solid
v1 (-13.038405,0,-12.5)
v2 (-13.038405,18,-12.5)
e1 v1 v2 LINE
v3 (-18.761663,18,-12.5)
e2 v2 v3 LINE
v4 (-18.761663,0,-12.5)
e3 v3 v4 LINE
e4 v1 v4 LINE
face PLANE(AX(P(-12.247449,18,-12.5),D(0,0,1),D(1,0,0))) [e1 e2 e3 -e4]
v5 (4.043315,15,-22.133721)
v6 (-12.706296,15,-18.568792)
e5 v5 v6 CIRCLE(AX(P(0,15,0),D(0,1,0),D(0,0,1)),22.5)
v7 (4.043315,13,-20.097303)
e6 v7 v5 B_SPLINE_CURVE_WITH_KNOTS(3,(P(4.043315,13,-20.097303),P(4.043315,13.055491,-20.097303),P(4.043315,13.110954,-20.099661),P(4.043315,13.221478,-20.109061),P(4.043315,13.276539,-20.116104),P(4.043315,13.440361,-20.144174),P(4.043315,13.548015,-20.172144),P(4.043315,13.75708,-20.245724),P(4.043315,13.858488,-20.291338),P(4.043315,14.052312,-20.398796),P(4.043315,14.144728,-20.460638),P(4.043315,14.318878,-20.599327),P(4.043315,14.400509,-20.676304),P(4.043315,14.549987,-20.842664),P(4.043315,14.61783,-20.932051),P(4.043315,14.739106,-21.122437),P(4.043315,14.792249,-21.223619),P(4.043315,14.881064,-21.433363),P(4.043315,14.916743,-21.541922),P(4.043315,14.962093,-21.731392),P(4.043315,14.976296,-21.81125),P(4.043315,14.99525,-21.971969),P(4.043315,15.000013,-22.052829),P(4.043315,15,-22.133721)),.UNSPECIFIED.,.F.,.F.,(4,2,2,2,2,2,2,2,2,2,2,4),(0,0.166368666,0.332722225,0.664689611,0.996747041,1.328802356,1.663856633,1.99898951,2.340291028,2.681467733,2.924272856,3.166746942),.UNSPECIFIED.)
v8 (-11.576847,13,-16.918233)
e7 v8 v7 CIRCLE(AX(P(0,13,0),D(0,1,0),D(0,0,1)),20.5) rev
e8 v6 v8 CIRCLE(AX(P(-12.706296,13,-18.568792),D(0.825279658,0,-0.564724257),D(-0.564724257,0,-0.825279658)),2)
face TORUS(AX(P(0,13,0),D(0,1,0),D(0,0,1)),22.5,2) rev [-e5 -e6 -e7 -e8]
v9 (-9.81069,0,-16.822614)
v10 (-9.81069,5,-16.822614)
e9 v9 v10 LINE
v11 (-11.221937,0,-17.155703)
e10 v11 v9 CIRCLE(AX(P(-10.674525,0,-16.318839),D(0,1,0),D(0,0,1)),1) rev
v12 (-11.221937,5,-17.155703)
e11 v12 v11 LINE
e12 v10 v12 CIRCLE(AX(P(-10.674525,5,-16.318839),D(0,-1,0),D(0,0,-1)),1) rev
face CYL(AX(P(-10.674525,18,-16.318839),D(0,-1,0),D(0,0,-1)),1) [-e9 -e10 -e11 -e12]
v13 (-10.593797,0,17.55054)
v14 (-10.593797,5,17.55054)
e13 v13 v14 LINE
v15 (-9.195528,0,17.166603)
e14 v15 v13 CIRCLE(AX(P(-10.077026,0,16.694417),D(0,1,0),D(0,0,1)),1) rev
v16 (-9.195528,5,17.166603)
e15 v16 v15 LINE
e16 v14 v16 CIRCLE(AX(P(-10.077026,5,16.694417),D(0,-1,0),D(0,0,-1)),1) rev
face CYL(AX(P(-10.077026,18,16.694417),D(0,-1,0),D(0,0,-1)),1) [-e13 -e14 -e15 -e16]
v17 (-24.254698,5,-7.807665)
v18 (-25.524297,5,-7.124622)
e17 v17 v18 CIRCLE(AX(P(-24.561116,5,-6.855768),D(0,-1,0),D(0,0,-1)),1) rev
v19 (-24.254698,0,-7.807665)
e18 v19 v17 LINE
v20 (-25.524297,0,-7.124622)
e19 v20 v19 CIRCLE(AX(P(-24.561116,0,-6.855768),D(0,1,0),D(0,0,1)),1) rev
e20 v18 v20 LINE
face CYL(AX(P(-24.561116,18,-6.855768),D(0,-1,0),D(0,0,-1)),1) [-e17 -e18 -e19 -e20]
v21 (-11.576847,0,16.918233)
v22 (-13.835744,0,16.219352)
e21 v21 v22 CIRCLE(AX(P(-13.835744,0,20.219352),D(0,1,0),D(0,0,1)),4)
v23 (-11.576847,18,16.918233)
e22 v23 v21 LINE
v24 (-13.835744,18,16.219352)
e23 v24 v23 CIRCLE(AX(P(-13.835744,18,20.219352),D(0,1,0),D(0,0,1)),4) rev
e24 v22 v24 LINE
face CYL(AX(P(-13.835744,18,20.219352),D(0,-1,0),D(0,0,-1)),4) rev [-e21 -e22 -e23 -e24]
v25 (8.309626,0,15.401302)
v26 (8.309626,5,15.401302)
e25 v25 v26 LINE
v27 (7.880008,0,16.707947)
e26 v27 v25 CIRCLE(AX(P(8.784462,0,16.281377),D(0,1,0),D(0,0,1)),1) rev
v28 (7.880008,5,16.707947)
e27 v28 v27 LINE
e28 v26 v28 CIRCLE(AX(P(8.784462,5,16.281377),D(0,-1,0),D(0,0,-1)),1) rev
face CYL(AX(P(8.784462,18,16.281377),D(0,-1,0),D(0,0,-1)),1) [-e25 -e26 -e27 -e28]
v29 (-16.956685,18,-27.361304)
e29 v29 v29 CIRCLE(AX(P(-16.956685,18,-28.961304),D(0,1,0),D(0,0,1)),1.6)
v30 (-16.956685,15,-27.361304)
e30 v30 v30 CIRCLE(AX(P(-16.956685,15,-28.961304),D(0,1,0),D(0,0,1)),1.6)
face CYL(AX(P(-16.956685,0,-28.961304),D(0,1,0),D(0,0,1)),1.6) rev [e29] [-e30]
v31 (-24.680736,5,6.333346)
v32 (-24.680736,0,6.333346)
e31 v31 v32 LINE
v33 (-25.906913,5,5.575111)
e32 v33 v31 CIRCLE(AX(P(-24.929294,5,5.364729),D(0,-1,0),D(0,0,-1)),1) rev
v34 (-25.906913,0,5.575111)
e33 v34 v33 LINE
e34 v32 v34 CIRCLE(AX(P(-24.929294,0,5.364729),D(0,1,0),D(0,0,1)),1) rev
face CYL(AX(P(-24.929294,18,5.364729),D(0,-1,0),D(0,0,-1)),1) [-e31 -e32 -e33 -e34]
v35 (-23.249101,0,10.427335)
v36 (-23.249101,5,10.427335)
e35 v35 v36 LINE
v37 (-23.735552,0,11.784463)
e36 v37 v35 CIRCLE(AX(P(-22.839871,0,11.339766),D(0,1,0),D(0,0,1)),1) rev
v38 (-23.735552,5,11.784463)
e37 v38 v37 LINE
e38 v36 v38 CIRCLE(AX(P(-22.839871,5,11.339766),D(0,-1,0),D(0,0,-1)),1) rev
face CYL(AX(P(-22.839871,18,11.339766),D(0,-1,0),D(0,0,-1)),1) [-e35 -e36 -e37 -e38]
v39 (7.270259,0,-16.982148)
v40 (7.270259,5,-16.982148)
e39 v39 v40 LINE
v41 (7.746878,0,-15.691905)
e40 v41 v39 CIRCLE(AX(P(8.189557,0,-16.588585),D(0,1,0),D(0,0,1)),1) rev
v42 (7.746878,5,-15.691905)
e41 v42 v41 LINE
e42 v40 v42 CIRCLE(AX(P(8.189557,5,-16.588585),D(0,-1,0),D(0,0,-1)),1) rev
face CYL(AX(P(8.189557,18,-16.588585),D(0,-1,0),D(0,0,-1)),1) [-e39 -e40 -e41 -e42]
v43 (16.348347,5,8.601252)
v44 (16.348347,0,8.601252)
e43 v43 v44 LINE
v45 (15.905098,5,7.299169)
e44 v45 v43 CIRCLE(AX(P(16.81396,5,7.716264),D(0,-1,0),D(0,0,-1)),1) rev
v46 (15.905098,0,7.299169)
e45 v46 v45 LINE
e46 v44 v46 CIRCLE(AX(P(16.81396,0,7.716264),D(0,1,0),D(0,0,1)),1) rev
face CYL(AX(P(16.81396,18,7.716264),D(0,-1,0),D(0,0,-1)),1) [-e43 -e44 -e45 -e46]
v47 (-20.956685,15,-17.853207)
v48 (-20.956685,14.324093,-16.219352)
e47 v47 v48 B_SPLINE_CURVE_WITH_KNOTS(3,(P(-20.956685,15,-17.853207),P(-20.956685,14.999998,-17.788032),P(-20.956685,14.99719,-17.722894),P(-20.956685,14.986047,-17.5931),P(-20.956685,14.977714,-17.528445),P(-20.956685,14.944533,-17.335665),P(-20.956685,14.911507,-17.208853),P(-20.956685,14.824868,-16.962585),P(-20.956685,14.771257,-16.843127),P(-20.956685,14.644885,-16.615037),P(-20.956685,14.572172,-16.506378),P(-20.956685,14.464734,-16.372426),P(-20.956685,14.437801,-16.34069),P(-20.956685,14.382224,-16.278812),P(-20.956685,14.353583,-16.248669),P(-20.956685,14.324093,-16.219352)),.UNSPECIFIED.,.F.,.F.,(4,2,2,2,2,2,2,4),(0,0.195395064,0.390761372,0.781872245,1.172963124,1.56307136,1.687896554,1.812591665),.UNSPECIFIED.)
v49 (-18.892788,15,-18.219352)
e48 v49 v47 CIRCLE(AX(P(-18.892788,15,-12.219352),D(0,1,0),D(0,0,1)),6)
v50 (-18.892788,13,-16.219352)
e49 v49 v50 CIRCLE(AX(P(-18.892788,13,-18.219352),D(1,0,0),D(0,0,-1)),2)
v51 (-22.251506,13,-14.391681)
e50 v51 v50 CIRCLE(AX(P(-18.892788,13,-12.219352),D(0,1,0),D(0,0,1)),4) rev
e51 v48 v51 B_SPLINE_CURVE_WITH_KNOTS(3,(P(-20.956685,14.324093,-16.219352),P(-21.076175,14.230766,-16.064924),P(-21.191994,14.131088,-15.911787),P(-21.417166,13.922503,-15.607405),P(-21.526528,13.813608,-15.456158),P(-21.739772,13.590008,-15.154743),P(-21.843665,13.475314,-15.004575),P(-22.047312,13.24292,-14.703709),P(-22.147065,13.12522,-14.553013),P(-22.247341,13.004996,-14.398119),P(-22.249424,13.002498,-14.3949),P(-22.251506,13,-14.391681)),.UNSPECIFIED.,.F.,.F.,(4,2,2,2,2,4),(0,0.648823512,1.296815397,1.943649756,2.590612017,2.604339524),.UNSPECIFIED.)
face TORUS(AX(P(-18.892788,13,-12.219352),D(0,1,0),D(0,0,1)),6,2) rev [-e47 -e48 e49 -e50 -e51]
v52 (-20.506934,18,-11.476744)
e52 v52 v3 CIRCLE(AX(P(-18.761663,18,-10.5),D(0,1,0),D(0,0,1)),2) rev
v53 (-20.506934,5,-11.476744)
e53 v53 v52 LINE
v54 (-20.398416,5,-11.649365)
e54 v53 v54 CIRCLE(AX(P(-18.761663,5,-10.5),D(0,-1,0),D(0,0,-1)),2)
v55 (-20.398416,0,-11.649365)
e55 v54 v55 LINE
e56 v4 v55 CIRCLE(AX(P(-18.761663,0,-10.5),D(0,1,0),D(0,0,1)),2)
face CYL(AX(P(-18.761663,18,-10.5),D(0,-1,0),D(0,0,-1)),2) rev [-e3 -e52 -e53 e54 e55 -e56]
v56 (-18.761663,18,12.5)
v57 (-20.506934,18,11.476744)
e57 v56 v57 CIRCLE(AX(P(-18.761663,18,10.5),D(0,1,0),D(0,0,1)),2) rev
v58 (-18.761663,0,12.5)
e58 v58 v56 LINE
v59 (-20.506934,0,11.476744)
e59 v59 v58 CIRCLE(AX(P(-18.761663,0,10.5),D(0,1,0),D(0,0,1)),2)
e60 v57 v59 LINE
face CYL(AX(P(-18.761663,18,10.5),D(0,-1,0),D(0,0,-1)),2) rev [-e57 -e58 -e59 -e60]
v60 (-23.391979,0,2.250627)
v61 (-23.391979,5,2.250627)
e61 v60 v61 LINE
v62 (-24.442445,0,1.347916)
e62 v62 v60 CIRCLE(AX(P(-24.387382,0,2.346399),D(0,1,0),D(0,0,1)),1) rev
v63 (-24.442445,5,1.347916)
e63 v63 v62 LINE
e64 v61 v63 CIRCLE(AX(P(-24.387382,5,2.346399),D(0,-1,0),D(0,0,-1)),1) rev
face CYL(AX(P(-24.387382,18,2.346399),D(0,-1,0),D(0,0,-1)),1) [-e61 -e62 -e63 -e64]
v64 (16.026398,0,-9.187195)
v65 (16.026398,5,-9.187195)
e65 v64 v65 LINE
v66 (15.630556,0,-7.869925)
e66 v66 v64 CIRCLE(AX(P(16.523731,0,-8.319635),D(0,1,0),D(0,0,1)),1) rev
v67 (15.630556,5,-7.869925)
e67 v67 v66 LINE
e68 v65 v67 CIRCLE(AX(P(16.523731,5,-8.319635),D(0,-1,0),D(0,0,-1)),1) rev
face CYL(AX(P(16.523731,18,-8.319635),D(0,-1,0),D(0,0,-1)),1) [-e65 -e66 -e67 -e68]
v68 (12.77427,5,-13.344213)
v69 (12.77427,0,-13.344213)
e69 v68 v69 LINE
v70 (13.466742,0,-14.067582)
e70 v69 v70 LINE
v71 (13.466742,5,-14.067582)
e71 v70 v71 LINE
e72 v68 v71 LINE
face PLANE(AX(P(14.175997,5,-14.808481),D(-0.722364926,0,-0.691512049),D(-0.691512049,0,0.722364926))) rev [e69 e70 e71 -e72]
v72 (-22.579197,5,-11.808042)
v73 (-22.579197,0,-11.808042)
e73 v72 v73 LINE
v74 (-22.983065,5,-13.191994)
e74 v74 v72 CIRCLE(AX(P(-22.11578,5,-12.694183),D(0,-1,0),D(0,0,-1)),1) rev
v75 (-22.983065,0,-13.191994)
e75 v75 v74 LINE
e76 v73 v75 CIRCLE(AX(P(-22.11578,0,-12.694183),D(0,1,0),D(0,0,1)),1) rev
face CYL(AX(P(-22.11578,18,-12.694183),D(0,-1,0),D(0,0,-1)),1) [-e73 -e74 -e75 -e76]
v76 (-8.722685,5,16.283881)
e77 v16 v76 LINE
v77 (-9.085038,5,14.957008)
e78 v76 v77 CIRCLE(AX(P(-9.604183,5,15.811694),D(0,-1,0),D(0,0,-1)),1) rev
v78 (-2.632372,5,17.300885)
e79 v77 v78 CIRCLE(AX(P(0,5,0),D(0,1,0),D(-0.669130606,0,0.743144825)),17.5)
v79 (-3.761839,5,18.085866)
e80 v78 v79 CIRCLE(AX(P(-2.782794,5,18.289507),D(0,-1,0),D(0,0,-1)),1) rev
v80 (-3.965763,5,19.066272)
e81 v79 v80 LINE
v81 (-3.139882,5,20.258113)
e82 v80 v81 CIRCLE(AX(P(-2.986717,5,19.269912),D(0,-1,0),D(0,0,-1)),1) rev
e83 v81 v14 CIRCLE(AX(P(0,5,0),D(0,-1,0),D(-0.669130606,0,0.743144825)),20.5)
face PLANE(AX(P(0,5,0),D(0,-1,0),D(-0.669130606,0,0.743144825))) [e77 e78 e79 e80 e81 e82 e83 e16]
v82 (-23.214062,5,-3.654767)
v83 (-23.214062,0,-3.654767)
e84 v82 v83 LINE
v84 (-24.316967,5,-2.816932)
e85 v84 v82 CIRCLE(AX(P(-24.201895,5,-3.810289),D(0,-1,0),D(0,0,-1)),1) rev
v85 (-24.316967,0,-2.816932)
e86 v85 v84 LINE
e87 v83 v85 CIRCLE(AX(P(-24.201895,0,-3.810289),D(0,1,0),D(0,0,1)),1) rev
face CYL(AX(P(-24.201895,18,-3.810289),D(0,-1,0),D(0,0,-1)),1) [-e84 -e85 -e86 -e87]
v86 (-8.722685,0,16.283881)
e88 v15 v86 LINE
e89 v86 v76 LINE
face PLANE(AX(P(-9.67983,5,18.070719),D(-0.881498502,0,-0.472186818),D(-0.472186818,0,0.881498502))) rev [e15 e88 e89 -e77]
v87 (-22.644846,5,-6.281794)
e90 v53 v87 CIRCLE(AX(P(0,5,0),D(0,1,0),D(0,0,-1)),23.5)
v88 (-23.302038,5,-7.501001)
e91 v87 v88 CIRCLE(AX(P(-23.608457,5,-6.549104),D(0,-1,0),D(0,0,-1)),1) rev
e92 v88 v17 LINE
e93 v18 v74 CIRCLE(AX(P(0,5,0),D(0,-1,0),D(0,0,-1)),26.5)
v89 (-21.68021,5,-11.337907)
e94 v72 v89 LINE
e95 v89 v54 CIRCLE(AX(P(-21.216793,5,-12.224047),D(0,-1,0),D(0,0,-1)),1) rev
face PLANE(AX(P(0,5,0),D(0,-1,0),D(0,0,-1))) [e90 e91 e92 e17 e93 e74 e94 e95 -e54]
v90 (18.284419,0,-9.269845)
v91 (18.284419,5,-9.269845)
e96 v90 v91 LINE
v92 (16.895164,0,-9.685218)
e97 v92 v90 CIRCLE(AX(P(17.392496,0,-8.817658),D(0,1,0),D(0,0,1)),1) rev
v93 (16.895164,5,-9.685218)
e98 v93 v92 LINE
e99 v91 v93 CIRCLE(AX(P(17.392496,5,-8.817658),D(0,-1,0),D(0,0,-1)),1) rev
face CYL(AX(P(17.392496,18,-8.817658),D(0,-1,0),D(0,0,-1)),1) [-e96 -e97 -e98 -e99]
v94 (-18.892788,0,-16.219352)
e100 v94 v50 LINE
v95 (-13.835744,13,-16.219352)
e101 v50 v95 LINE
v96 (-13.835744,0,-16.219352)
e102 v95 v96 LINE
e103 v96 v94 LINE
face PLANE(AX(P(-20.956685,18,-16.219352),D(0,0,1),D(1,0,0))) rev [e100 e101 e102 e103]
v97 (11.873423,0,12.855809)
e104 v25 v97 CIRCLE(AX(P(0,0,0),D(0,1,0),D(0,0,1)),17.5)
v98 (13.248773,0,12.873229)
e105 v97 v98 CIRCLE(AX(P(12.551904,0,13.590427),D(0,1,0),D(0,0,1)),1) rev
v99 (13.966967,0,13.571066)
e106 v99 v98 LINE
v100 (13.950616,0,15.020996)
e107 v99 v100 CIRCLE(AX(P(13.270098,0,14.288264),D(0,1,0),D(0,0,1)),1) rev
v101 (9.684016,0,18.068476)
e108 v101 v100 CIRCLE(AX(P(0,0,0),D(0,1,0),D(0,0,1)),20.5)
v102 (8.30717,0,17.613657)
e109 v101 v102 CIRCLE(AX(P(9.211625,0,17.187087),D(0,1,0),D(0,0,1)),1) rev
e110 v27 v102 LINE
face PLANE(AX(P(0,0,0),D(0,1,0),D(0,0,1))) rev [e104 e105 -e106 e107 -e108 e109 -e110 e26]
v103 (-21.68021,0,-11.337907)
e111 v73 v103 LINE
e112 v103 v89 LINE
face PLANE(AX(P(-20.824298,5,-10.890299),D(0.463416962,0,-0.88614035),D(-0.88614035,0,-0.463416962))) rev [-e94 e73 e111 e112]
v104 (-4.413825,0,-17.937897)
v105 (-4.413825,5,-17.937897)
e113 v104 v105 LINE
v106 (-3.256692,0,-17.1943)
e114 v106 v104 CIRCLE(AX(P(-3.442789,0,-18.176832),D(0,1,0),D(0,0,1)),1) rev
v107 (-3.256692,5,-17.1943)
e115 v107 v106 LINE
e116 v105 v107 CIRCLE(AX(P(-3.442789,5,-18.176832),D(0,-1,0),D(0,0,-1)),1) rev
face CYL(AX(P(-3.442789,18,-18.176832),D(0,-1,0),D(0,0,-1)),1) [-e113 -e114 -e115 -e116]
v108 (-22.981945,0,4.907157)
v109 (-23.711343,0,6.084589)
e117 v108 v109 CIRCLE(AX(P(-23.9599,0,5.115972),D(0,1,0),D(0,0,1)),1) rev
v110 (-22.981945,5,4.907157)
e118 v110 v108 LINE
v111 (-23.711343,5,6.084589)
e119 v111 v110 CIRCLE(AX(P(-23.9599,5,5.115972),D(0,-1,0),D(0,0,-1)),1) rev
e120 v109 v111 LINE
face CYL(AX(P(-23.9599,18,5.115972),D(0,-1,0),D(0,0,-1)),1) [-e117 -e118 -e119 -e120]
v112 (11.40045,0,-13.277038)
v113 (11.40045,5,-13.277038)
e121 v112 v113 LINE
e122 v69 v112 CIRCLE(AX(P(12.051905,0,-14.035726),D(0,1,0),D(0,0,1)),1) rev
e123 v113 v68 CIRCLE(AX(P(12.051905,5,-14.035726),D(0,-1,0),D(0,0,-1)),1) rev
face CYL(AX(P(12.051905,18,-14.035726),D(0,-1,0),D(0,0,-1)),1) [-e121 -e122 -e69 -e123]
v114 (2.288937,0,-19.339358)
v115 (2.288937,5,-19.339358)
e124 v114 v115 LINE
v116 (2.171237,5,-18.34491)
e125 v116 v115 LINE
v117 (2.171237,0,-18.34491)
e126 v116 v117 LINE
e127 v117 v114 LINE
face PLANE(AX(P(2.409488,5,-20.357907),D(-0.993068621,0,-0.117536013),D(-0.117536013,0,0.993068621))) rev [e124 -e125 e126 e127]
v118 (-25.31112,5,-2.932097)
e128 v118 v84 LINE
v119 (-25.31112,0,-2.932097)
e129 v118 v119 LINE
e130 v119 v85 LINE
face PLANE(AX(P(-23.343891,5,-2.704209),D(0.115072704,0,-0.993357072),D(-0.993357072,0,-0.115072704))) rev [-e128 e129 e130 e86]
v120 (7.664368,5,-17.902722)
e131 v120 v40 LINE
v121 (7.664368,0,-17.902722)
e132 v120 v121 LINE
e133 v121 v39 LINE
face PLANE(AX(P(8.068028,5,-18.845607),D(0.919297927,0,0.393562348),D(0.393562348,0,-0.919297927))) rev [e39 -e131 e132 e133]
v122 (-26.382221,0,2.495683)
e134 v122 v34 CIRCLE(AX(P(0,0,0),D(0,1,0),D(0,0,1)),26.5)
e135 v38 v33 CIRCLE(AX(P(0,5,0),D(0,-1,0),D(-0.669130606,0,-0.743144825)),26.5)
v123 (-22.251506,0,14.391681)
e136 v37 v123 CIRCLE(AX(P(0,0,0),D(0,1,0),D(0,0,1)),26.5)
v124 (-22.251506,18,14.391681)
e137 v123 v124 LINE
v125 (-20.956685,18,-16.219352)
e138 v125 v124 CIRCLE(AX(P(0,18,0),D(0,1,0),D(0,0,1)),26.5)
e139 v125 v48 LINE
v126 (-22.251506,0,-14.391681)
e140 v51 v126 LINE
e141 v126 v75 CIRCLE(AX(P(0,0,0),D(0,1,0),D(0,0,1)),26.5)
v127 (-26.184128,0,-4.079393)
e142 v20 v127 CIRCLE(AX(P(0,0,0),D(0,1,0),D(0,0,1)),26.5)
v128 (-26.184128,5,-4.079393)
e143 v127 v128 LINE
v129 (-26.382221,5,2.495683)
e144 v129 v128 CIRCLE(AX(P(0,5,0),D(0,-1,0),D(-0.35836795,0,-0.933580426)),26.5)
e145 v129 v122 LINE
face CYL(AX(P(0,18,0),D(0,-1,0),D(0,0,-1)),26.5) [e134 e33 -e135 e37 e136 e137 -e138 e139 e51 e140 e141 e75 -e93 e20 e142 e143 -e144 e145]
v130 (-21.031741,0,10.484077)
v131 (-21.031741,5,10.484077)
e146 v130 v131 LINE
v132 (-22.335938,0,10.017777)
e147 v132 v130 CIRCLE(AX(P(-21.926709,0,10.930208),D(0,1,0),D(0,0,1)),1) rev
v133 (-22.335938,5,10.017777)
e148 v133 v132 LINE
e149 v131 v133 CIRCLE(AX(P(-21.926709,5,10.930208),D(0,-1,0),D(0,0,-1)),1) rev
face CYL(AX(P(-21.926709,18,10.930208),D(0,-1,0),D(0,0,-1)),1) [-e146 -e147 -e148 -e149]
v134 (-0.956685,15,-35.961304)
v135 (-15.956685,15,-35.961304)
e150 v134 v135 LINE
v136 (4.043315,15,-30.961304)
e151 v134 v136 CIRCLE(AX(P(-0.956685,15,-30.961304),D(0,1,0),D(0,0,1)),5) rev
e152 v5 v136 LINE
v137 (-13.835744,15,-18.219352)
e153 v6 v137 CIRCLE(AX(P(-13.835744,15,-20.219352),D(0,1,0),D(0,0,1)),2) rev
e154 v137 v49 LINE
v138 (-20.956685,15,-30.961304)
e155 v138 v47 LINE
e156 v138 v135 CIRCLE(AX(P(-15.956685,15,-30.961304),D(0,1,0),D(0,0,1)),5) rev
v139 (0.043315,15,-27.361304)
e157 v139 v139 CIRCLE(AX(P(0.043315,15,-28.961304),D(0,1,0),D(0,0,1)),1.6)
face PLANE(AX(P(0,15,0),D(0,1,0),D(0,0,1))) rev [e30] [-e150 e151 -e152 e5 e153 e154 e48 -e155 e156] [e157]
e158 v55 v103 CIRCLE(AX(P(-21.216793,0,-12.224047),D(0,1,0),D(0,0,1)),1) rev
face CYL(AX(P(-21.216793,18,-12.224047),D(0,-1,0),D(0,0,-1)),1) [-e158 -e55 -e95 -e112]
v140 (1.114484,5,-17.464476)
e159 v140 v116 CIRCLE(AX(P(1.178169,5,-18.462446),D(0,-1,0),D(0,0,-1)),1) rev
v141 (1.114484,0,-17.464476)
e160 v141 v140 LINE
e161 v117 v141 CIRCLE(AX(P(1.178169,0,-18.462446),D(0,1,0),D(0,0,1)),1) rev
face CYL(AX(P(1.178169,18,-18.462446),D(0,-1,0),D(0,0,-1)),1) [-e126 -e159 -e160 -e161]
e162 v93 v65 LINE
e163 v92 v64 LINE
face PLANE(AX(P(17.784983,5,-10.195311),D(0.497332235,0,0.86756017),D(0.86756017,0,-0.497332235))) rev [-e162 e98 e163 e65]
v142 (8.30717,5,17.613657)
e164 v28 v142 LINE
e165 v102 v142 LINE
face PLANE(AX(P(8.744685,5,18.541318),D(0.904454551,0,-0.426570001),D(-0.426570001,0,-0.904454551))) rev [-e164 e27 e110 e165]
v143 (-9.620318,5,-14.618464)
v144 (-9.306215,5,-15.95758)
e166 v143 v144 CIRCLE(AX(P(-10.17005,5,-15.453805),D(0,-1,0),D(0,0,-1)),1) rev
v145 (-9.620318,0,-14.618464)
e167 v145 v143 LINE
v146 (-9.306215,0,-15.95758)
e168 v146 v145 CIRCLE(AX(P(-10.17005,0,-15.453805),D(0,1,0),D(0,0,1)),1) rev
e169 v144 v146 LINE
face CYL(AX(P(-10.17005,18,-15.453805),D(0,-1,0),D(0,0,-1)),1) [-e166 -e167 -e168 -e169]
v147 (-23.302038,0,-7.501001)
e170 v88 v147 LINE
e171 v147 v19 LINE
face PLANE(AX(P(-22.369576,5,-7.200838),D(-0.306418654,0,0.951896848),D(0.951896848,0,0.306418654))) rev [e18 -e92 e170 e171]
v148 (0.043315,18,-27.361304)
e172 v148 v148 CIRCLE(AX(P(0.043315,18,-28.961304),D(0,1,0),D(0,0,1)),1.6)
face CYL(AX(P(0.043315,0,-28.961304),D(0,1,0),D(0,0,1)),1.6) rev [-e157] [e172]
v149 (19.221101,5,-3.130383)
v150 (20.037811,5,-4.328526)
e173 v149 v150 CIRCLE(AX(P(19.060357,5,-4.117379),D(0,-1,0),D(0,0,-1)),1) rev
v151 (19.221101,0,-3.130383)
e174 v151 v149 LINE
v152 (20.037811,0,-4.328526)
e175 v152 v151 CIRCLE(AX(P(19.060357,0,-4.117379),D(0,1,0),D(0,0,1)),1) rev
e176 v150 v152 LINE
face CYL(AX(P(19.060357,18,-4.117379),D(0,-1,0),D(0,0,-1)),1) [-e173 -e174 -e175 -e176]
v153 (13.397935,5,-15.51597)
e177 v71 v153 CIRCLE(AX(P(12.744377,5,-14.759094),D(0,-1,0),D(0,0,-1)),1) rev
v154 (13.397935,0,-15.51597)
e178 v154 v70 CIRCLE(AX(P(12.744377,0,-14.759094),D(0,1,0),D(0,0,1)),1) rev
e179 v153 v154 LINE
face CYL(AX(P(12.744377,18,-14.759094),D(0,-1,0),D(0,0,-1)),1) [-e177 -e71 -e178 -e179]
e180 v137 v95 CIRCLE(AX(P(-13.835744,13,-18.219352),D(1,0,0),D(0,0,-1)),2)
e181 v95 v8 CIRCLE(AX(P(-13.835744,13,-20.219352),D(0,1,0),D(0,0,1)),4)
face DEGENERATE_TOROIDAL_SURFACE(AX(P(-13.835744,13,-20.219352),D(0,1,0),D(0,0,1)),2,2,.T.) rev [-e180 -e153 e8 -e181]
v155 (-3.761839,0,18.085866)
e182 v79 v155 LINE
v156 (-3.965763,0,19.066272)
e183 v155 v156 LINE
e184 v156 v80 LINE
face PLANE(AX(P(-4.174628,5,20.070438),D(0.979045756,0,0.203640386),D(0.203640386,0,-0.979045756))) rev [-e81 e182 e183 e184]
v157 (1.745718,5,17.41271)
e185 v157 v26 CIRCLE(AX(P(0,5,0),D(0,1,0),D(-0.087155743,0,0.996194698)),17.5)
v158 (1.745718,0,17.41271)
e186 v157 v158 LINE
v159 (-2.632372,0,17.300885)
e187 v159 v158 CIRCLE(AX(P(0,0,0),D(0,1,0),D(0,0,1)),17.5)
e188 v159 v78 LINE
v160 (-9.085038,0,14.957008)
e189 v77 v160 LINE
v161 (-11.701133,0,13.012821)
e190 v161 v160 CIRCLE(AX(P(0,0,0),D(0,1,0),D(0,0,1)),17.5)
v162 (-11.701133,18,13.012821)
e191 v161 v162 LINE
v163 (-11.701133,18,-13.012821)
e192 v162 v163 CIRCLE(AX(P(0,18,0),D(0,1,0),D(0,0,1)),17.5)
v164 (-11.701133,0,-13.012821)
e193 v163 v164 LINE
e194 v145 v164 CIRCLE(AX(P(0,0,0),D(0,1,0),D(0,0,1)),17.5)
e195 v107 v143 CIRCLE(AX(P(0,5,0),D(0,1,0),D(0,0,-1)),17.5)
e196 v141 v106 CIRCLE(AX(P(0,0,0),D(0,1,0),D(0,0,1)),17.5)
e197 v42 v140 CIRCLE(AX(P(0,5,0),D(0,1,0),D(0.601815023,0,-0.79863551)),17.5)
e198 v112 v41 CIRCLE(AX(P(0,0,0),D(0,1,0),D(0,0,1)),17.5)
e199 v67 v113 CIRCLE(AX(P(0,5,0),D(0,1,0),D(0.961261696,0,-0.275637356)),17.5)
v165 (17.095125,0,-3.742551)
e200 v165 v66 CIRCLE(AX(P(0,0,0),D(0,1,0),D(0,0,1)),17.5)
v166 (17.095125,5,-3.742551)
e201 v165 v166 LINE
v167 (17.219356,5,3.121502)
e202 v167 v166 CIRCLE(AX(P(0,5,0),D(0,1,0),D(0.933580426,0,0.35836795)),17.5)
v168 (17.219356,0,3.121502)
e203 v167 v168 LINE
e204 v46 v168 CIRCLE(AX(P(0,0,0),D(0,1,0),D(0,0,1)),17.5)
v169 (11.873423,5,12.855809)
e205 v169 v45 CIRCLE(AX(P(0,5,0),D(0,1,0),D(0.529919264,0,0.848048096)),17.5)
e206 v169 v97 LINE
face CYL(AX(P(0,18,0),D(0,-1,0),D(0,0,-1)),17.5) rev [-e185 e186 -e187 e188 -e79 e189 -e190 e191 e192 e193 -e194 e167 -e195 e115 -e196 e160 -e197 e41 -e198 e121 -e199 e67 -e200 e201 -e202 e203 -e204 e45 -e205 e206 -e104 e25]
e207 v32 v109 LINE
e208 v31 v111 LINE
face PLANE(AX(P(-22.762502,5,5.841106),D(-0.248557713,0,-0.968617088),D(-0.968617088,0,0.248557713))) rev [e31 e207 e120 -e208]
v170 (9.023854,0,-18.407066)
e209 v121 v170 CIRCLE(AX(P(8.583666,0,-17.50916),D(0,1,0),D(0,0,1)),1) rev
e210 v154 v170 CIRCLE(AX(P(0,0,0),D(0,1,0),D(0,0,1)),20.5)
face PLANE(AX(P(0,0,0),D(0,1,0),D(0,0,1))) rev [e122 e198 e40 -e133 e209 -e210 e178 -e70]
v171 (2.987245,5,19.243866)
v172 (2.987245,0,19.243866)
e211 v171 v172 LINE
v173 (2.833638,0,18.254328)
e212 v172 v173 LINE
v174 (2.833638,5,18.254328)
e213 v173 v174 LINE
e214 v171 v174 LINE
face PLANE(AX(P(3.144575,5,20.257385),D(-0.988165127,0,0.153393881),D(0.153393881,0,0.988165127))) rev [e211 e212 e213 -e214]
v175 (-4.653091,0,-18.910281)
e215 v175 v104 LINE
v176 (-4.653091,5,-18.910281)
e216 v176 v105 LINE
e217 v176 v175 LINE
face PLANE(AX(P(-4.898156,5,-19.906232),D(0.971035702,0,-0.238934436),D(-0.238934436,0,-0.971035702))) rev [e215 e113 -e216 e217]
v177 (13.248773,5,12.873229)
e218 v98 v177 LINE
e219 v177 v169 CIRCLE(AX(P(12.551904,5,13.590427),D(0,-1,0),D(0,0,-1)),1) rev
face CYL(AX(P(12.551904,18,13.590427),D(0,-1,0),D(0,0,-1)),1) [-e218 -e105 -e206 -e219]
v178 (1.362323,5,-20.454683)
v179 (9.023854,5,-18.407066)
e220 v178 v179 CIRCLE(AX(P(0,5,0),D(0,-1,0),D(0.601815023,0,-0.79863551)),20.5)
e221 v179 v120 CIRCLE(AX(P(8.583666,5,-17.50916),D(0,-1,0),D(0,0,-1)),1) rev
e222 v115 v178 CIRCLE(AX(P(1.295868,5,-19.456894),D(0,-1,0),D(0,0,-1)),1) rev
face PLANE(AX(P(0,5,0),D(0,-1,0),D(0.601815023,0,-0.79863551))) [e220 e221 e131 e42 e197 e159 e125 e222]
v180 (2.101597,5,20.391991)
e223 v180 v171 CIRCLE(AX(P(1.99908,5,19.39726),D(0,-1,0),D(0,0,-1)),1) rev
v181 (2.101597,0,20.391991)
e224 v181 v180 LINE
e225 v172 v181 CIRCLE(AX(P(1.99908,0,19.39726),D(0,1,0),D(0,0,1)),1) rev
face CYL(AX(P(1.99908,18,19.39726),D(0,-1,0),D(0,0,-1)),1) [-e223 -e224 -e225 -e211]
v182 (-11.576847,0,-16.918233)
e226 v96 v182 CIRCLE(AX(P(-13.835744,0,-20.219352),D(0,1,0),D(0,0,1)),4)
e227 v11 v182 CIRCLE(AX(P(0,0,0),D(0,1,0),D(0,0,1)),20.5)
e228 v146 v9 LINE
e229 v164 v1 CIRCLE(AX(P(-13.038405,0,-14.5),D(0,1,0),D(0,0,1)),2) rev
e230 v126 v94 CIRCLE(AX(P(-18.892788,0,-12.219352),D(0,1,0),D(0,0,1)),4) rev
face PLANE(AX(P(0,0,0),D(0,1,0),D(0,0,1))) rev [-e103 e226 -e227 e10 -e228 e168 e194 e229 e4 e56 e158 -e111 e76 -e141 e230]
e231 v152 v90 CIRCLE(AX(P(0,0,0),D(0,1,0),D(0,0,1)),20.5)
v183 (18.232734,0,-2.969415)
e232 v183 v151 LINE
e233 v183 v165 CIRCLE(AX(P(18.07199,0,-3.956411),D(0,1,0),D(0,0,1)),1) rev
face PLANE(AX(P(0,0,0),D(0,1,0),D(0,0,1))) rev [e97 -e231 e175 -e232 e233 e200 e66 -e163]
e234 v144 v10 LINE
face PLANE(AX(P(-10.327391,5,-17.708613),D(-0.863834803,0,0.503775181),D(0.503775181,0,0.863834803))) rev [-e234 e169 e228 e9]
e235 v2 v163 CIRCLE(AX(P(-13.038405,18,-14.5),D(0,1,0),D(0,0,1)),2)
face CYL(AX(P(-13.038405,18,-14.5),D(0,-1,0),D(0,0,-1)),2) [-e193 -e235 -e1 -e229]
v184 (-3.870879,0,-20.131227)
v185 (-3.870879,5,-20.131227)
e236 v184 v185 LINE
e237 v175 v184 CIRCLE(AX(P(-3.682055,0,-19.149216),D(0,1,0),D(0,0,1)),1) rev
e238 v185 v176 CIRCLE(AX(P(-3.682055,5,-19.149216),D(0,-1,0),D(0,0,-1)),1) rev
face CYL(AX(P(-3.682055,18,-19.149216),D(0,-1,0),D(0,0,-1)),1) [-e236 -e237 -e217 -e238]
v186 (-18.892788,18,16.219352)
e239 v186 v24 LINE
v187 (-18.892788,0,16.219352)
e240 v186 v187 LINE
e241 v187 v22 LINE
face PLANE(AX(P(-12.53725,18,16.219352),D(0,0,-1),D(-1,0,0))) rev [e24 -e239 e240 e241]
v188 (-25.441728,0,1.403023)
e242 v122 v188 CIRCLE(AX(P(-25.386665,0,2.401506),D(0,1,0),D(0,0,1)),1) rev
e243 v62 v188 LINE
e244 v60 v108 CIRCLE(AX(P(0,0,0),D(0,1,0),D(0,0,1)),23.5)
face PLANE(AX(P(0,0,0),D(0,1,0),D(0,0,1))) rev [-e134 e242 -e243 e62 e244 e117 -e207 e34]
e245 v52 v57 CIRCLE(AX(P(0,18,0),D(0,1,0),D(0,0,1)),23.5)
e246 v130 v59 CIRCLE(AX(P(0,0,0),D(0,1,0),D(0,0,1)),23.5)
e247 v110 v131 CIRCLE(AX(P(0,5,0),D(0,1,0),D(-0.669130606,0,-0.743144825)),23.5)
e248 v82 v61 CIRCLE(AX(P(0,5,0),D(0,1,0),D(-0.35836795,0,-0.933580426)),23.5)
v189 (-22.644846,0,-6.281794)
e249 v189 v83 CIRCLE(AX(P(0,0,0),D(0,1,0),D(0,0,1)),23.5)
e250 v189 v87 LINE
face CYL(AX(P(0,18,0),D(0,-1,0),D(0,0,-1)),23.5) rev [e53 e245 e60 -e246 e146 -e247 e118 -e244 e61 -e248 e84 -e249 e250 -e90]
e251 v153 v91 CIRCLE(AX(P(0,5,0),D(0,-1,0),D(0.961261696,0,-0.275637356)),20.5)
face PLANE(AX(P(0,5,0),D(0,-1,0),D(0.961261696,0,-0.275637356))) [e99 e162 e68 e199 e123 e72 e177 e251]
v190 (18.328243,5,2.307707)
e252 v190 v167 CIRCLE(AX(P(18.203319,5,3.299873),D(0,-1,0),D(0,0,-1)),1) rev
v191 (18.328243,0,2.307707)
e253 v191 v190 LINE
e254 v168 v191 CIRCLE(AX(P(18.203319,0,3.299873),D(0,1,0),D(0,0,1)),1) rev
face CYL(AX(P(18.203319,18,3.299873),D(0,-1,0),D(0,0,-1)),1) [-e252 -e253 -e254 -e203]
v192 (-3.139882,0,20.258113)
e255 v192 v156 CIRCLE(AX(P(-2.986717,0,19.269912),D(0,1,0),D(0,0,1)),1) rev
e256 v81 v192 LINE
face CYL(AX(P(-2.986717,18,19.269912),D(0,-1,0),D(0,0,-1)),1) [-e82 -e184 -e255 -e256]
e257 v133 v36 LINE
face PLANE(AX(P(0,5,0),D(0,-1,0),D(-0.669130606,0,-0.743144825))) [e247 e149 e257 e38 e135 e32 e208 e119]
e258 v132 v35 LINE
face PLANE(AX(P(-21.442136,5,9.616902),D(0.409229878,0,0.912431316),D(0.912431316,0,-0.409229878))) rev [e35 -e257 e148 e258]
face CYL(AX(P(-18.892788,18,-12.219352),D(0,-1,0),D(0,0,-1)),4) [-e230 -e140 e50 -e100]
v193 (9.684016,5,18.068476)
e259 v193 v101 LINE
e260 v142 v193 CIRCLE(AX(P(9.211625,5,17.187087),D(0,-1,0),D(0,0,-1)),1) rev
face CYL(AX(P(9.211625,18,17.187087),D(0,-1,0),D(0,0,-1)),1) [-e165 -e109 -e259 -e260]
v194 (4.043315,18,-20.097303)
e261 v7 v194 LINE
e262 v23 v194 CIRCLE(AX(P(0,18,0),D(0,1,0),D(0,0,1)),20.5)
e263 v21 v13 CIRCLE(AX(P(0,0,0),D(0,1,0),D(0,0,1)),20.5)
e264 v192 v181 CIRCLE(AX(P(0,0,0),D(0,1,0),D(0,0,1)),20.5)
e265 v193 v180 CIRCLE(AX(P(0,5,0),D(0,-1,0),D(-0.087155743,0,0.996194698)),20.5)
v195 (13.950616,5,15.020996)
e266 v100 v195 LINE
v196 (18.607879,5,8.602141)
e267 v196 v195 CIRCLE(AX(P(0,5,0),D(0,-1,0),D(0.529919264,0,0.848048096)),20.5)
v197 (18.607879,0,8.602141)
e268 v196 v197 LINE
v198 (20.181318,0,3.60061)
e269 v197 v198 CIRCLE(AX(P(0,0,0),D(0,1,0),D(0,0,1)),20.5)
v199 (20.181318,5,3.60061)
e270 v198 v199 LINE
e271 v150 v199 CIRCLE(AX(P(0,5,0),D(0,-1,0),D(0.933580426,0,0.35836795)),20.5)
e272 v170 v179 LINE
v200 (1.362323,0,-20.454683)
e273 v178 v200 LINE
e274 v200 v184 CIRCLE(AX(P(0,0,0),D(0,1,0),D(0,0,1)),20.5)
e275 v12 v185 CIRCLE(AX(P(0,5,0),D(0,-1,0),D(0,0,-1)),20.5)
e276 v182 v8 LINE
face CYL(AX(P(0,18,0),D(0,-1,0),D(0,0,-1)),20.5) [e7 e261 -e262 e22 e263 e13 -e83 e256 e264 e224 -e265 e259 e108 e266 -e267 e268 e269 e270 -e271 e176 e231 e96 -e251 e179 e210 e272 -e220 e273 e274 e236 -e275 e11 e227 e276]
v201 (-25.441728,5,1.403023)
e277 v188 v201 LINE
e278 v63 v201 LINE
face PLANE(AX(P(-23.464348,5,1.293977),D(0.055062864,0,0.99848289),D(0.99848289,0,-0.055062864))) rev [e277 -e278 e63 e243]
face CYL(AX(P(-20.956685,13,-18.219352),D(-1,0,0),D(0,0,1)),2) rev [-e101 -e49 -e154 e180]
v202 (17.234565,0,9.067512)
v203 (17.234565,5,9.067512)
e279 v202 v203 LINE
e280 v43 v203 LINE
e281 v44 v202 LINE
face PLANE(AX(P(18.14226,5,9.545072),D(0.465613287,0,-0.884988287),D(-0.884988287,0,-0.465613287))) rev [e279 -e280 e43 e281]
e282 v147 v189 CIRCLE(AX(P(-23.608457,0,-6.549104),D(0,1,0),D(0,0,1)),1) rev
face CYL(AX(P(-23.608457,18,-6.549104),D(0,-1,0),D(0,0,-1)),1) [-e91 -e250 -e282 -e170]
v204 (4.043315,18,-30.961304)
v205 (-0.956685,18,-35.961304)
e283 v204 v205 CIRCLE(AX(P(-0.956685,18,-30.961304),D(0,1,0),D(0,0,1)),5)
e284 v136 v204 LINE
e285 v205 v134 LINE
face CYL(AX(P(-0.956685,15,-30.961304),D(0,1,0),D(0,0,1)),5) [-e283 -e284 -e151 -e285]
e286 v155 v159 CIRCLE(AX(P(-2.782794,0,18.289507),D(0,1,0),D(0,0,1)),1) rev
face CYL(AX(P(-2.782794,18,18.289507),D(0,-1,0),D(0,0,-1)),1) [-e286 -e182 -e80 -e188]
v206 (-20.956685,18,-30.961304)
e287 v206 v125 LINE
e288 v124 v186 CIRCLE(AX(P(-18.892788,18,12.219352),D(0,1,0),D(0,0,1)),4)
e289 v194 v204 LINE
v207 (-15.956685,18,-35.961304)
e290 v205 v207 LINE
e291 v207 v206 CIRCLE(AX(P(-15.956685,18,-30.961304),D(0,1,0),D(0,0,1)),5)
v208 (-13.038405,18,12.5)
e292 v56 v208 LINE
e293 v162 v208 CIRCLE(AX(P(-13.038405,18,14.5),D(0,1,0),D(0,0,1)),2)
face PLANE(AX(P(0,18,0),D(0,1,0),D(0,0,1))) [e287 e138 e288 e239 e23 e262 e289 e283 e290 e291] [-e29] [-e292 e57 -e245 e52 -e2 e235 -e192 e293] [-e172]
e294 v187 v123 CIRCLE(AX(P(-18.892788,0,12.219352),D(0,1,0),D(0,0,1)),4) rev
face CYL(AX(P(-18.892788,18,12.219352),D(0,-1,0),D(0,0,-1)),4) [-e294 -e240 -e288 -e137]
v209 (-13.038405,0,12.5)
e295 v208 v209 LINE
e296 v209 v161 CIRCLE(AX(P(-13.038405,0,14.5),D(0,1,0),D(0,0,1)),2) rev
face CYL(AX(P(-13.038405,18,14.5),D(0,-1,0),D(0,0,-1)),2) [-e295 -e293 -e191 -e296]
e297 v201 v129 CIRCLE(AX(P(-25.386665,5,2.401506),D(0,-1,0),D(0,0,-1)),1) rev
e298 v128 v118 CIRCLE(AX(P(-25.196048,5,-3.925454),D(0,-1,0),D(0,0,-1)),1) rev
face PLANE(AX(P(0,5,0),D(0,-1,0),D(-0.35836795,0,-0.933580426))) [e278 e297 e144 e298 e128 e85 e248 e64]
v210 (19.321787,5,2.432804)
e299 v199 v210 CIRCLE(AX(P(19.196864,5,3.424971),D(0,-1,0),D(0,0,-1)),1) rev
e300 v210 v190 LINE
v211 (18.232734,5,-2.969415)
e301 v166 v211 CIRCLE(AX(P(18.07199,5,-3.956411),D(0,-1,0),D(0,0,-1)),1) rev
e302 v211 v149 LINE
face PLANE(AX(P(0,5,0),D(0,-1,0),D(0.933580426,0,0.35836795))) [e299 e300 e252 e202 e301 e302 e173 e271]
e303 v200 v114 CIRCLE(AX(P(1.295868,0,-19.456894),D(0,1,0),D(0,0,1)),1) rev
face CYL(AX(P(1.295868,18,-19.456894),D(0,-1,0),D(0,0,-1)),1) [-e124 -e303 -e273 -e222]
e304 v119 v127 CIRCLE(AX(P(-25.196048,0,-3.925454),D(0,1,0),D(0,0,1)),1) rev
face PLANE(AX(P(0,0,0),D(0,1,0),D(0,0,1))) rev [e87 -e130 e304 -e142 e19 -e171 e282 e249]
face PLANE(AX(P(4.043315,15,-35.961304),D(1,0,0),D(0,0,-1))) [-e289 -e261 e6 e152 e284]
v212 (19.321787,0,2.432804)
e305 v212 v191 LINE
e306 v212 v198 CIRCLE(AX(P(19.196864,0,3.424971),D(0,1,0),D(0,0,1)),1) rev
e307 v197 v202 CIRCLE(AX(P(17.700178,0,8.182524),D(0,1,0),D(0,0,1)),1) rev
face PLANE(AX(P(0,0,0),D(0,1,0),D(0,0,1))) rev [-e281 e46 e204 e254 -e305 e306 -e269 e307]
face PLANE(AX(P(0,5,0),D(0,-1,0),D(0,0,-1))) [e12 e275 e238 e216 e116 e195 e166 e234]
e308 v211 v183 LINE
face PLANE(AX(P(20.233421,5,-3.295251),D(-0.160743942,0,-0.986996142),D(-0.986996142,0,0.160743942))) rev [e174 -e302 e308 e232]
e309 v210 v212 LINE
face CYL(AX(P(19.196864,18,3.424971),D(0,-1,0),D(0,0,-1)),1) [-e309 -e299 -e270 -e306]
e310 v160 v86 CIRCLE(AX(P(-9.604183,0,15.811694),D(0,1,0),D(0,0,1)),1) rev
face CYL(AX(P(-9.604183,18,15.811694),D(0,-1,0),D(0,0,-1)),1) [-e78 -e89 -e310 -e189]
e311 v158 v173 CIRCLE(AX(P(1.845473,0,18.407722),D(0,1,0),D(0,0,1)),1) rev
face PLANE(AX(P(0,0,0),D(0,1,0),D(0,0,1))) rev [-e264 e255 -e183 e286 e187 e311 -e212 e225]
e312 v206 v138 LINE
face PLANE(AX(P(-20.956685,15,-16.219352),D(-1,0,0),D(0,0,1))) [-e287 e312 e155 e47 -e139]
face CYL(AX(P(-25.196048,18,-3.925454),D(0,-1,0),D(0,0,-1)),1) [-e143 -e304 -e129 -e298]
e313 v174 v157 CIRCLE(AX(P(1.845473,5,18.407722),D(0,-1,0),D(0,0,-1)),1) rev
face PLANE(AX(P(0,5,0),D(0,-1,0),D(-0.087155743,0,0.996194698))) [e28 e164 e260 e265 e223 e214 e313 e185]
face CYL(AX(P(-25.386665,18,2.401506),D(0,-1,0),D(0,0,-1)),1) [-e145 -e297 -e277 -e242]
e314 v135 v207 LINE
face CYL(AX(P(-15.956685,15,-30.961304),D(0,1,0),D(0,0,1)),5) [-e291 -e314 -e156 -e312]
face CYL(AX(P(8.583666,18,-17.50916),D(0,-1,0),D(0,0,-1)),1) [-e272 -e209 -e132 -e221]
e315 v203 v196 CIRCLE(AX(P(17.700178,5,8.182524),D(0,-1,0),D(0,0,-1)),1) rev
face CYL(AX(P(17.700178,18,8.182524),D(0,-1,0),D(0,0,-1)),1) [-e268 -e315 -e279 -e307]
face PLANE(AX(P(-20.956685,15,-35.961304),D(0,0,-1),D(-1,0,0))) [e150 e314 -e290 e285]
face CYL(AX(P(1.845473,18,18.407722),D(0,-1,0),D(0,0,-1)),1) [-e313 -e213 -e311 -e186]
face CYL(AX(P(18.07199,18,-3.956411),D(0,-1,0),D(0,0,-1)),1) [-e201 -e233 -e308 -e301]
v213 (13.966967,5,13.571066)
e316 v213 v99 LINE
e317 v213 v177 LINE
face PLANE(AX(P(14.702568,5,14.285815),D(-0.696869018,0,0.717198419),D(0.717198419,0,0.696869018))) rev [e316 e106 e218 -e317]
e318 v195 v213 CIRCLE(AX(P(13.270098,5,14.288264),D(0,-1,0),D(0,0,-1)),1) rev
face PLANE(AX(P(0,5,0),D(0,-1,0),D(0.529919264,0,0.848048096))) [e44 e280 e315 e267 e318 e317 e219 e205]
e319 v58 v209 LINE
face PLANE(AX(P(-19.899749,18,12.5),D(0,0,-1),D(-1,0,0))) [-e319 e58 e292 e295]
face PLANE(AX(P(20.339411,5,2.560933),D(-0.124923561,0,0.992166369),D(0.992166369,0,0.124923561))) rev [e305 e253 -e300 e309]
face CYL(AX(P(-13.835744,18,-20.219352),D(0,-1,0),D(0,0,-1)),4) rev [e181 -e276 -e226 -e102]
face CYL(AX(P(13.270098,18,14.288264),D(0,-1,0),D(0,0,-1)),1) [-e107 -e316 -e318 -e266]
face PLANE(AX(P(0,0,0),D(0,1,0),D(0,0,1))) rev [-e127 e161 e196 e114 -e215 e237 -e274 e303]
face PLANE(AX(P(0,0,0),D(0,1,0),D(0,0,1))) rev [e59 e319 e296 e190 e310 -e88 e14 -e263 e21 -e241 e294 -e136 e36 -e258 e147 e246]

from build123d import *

# Parameters (mm, degrees)
BOSS_EXTRUDE1_DEPTH      = 18
BOSS_EXTRUDE2_START      = -3
BOSS_EXTRUDE2_DEPTH      = 3
SKETCH3_R                = 1.6
CUT_EXTRUDE1_DEPTH       = 49.160828036
FILLET1_R                = 2
FILLET2_R                = 4
FILLET3_R                = 2
FILLET4_R                = 5
CUT_EXTRUDE2_DEPTH       = 5
FILLET5_R                = 1
CIRPATTERN1_COUNT        = 7
CIRPATTERN1_ANGLE        = 222
FILLET5_OF_CIRPATTERN1_R = 1
CUT_EXTRUDE3_DEPTH       = 5
FILLET6_R                = 1
CIRPATTERN2_COUNT        = 3
CIRPATTERN2_ANGLE        = 42
FILLET6_OF_CIRPATTERN2_R = 1


with BuildPart() as part:
    # Sketch1 → Boss-Extrude1 (new body)
    with BuildSketch(Plane(origin=(0, 0, 0), x_dir=(1, 0, 0), z_dir=(0, 1, 0))):
        with BuildLine():
            Line((-20.956684691, 16.219351614), (-12.537249827, 16.219351614))
            ThreePointArc((-12.537249827, 16.219351614), (20.5, 0), (-12.537249827, -16.219351614))
            Line((-12.537249827, -16.219351614), (-20.956684691, -16.219351614))
            ThreePointArc((-20.956684691, -16.219351614), (-26.5, 0), (-20.956684691, 16.219351614))
        make_face()
        with BuildLine():
            Line((-12.247448714, 12.5), (-19.899748742, 12.5))
            ThreePointArc((-19.899748742, 12.5), (-23.5, 0), (-19.899748742, -12.5))
            Line((-19.899748742, -12.5), (-12.247448714, -12.5))
            ThreePointArc((-12.247448714, -12.5), (17.5, 0), (-12.247448714, 12.5))
        make_face(mode=Mode.SUBTRACT)
    extrude(amount=BOSS_EXTRUDE1_DEPTH)

    # Sketch2 → Boss-Extrude2 (add)
    with BuildSketch(Plane(origin=(0, 18, 0), x_dir=(1, 0, 0), z_dir=(0, 1, 0)).offset(BOSS_EXTRUDE2_START)):
        with BuildLine():
            Line((-20.956684691, 16.219351614), (-20.956684691, 35.961303608))
            Line((-20.956684691, 35.961303608), (4.043315309, 35.961303608))
            Line((4.043315309, 35.961303608), (4.043315309, 20.097303334))
            ThreePointArc((4.043315309, 20.097303334), (-4.668657011, 19.961303608), (-12.537249827, 16.219351614))
            Line((-12.537249827, 16.219351614), (-20.956684691, 16.219351614))
        make_face()
    extrude(amount=BOSS_EXTRUDE2_DEPTH)

    # Sketch3 → Cut-Extrude1 (cut, through all)
    with BuildSketch(Plane(origin=(0, 18, 0), x_dir=(1, 0, 0), z_dir=(0, 1, 0))):
        with Locations(Location((-16.956684691, 28.961303608, 0), (0, 0, 270))):
            Circle(SKETCH3_R)
        with Locations(Location((0.043315309, 28.961303608, 0), (0, 0, 270))):
            Circle(SKETCH3_R)
    extrude(amount=-CUT_EXTRUDE1_DEPTH, mode=Mode.SUBTRACT)

    # Fillet1
    fillet1_edges = [part.edges().sort_by_distance(p)[0] for p in [
        (-12.247448714, 9, 12.5),
        (-12.247448714, 9, -12.5),
        (-19.899748742, 9, -12.5),
        (-19.899748742, 9, 12.5),
    ]]
    fillet(fillet1_edges, radius=FILLET1_R)

    # Fillet2
    fillet2_edges = [part.edges().sort_by_distance(p)[0] for p in [
        (-20.956684691, 7.5, -16.219351614),
        (-12.537249827, 7.5, -16.219351614),
        (-12.537249827, 9, 16.219351614),
        (-20.956684691, 9, 16.219351614),
    ]]
    fillet(fillet2_edges, radius=FILLET2_R)

    # Fillet3
    # the kernel refuses this fillet: 2 mm, written as the material it adds along each edge
    with BuildSketch(Plane(origin=(-18.892788204, 15, -12.219351614), x_dir=(-0.7800199921709761, 0, 0.6257545939212836), z_dir=(0.6257545939212836, 0, 0.7800199921709761))) as fillet3_piece_1_section:
        with BuildLine():
            CenterArc((4 + FILLET3_R, FILLET3_R), FILLET3_R, 180, 90)
            Line((4 + FILLET3_R, 0), (4, 0))
            Line((4, 0), (4, FILLET3_R))
        make_face()
    fillet3_piece_1 = revolve(axis=Axis((-18.892788204, 15, -12.219351614), (0, -1, 0)), revolution_arc=128.737594097, mode=Mode.PRIVATE)
    fillet3_piece_1 = fillet3_piece_1 & Plane(origin=(0, 14.307087346, 0), x_dir=(-0.7908182902157775, 0, 0.6120510042963694), z_dir=(0, -1, 0)) * Cylinder(26.5, 24, mode=Mode.PRIVATE)
    add(fillet3_piece_1)
    with BuildSketch(Plane(origin=(-18.892788204, 15, -12.219351614), x_dir=(-0.7800199921709761, 0, 0.6257545939212836), z_dir=(0.6257545939212836, 0, 0.7800199921709761))) as fillet3_piece_2_section:
        with BuildLine():
            CenterArc((4 + FILLET3_R, FILLET3_R), FILLET3_R, 180, 90)
            Line((4 + FILLET3_R, 0), (4, 0))
            Line((4, 0), (4, FILLET3_R))
        make_face()
    fillet3_piece_2 = revolve(axis=Axis((-18.892788204, 15, -12.219351614), (0, -1, 0)), revolution_arc=128.737594097, mode=Mode.PRIVATE)
    fillet3_piece_2 = split(fillet3_piece_2, bisect_by=Plane(origin=(-20.956684691, 14.868636222, -16.97413776), z_dir=(1, 0, 0)), keep=Keep.TOP, mode=Mode.PRIVATE)
    add(fillet3_piece_2)
    with BuildSketch(Plane(origin=(-13.835744299, 15, -16.219351614), x_dir=(0, -1, 0), z_dir=(-1, 0, 0))) as fillet3_piece_3:
        with BuildLine():
            CenterArc((FILLET3_R, -FILLET3_R), FILLET3_R, 90, 90)
            Line((0, -FILLET3_R), (0, 0))
            Line((0, 0), (FILLET3_R, 0))
        make_face()
    extrude(amount=5.057043905)
    with BuildSketch(Plane(origin=(-13.835744299, 15, -20.219351614), x_dir=(0, 0, 1), z_dir=(-1, 0, 0))) as fillet3_piece_4:
        with BuildLine():
            CenterArc((4 - FILLET3_R, -FILLET3_R), FILLET3_R, 0, 90)
            Line((4 - FILLET3_R, 0), (4, 0))
            Line((4, 0), (4, -FILLET3_R))
        make_face()
    revolve(axis=Axis((-13.835744299, 15, -20.219351614), (0, 1, 0)), revolution_arc=34.383145423)
    with BuildSketch(Plane(origin=(0, 15, 0), x_dir=(0.42816780762581996, 0, -0.9036992467148011), z_dir=(0.9036992467148011, 0, 0.42816780762581996))) as fillet3_piece_5_section:
        with BuildLine():
            CenterArc((20.5 + FILLET3_R, -FILLET3_R), FILLET3_R, 90, 90)
            Line((20.5 + FILLET3_R, 0), (20.5, 0))
            Line((20.5, 0), (20.5, -FILLET3_R))
        make_face()
    fillet3_piece_5 = revolve(axis=Axis((0, 15, 0), (0, 1, 0)), revolution_arc=59.734486114, mode=Mode.PRIVATE)
    fillet3_piece_5 = split(fillet3_piece_5, bisect_by=Plane(origin=(4.043315309, 14.430830573, -20.645912342), z_dir=(-1, 0, 0)), keep=Keep.TOP, mode=Mode.PRIVATE)
    add(fillet3_piece_5)

    # Fillet4
    fillet4_edges = [part.edges().sort_by_distance(p)[0] for p in [
        (-20.956684691, 16.5, -35.961303608),
        (4.043315309, 16.5, -35.961303608),
    ]]
    fillet(fillet4_edges, radius=FILLET4_R)

    # Sketch4 → Cut-Extrude2 (cut)
    with BuildSketch(Plane.XZ):
        with BuildLine():
            Line((-10.327391218, -17.708613459), (-8.816065674, -15.11710905))
            ThreePointArc((-8.816065674, -15.11710905), (-6.56605509, -16.221495633), (-4.181352636, -16.99312479))
            Line((-4.181352636, -16.99312479), (-4.898155945, -19.906231897))
            ThreePointArc((-4.898155945, -19.906231897), (-7.691664534, -19.002323455), (-10.327391218, -17.708613459))
        make_face()
    cut_extrude2 = extrude(amount=-CUT_EXTRUDE2_DEPTH, mode=Mode.SUBTRACT)

    # Fillet5
    fillet5_edges = [part.edges().sort_by_distance(p)[0] for p in [
        (-4.898155945, 2.5, -19.906231897),
        (-10.327391218, 2.5, -17.708613459),
        (-8.816065674, 2.5, -15.11710905),
        (-4.181352636, 2.5, -16.99312479),
    ]]
    fillet(fillet5_edges, radius=FILLET5_R)

    # CirPattern1: Cut-Extrude2 ×7 about axis
    cirpattern1_axis = Axis((0, 0, 0), (0, -1, 0))
    for i in range(1, CIRPATTERN1_COUNT):
        add(cut_extrude2.rotate(cirpattern1_axis, i * CIRPATTERN1_ANGLE / (CIRPATTERN1_COUNT - 1)), mode=Mode.SUBTRACT)

    # Fillet5 of CirPattern1
    fillet5_of_cirpattern1_edges = [part.edges().sort_by_distance(p)[0] for p in [
        (8.068028139, 2.5, -18.845607497),
        (2.409488266, 2.5, -20.357906727),
        (2.056880227, 2.5, -17.378700864),
        (6.887341094, 2.5, -16.087713717),
        (17.78498348, 2.5, -10.195310815),
        (14.175996999, 2.5, -14.808480985),
        (12.101460852, 2.5, -12.641386207),
        (15.182302971, 2.5, -8.70331411),
        (20.339410567, 2.5, 2.560932992),
        (20.23342092, 2.5, -3.295250803),
        (17.272432493, 2.5, -2.813018978),
        (17.36291146, 2.5, 2.186162311),
        (14.702567584, 2.5, 14.285814868),
        (18.142259875, 2.5, 9.545072374),
        (15.487295015, 2.5, 8.148232514),
        (12.550972328, 2.5, 12.195207814),
        (3.144574556, 2.5, 20.257385094),
        (8.744685017, 2.5, 18.541318291),
        (7.464975015, 2.5, 15.827954638),
        (2.684392914, 2.5, 17.292889715),
        (-9.679829775, 2.5, 18.070719286),
        (-4.174627918, 2.5, 20.070438006),
        (-3.563706759, 2.5, 17.133300737),
        (-8.26326932, 2.5, 15.426223781),
    ]]
    fillet(fillet5_of_cirpattern1_edges, radius=FILLET5_OF_CIRPATTERN1_R)

    # Sketch5 → Cut-Extrude3 (cut)
    with BuildSketch(Plane.XZ):
        with BuildLine():
            Line((-20.824298223, -10.890298596), (-23.482719273, -12.28054948))
            ThreePointArc((-23.482719273, -12.28054948), (-24.442674065, -10.237464752), (-25.225266465, -8.12009432))
            Line((-25.225266465, -8.12009432), (-22.369575922, -7.20083836))
            ThreePointArc((-22.369575922, -7.20083836), (-21.675578888, -9.078506478), (-20.824298223, -10.890298596))
        make_face()
    cut_extrude3 = extrude(amount=-CUT_EXTRUDE3_DEPTH, mode=Mode.SUBTRACT)

    # Fillet6
    # the kernel refuses this fillet: 1 mm, written as the material it takes off along each edge
    with BuildSketch(Plane(origin=(-22.369575922, -2.448958324, -7.20083836), x_dir=(-0.28692429499419836, 0, 0.9579532603118391), z_dir=(0, 1, 0))) as fillet6_piece_1:
        with BuildLine():
            CenterArc((0.979795982, -0.999791645), FILLET6_R, 91.169626537, 87.660746926)
            Line((-0.019995663, -0.979379229), (0, 0))
            ThreePointArc((0, 0), (0.479691783, -0.004896344), (0.959383566, 0))
        make_face()
    extrude(amount=7.448958324, mode=Mode.SUBTRACT)
    with BuildSketch(Plane(origin=(-20.824298223, -2.414717082, -10.890298596), x_dir=(-0.8861403499271628, 0, -0.4634169615270522), z_dir=(0, 1, 0))) as fillet6_piece_2:
        with BuildLine():
            CenterArc((0.965886833, -1), FILLET6_R, 90, 82.530423004)
            Line((-0.025627196, -0.870000265), (-0.124778599, -0.857000292))
            ThreePointArc((-0.124778599, -0.857000292), (-0.109420136, -0.663907842), (-0.1, 0))
            Line((-0.1, 0), (0, 0.1))
            Line((0, 0.1), (0.965886833, 0.1))
            Line((0.965886833, 0.1), (0.965886833, 0))
        make_face()
    extrude(amount=7.414717082, mode=Mode.SUBTRACT)
    with BuildSketch(Plane(origin=(-23.482719273, -2.598538983, -12.28054948), x_dir=(0.8861403499271632, 0, 0.4634169615270516), z_dir=(0, 1, 0))) as fillet6_piece_3:
        with BuildLine():
            CenterArc((1.019615388, 1), FILLET6_R, 177.752530382, 92.247469618)
            ThreePointArc((0.020384618, 1.039215686), (0.005096645, 0.519707797), (0, 0))
            Line((0, 0), (1.019615388, 0))
        make_face()
    extrude(amount=7.598538983, mode=Mode.SUBTRACT)
    with BuildSketch(Plane(origin=(-25.225266465, -2.598538983, -8.12009432), x_dir=(-0.28769148679844025, 0, 0.9577231376675114), z_dir=(0, 1, 0))) as fillet6_piece_4:
        with BuildLine():
            CenterArc((1.019803978, 0.999807674), FILLET6_R, 178.876265191, 92.247469618)
            Line((0.019996304, 1.019419289), (0, 0))
            ThreePointArc((0, 0), (0.519707797, -0.005096645), (1.039415593, 0))
        make_face()
    extrude(amount=7.598538983, mode=Mode.SUBTRACT)

    # CirPattern2: Cut-Extrude3 ×3 about axis
    cirpattern2_axis = Axis((0, -0.9, 0), (0, 1, 0))
    for i in range(1, CIRPATTERN2_COUNT):
        add(cut_extrude3.rotate(cirpattern2_axis, i * CIRPATTERN2_ANGLE / (CIRPATTERN2_COUNT - 1)), mode=Mode.SUBTRACT)

    # Fillet6 of CirPattern2
    # the kernel refuses this fillet: 1 mm, written as the material it takes off along each edge
    with BuildSketch(Plane(origin=(-23.464347908, -2.448958324, 1.293977308), x_dir=(0.07543283996510414, 0, 0.9971508845981129), z_dir=(0, 1, 0)), Plane(origin=(-21.442135932, -2.448958324, 9.616902134), x_dir=(0.42776954080722046, 0, 0.9038878359384973), z_dir=(0, 1, 0))) as fillet6_of_cirpattern2_piece_1:
        with BuildLine():
            CenterArc((0.979795982, -0.999791645), FILLET6_OF_CIRPATTERN2_R, 91.169626537, 87.660746926)
            Line((-0.019995663, -0.979379229), (0, 0))
            ThreePointArc((0, 0), (0.479691783, -0.004896344), (0.959383566, 0))
        make_face()
    extrude(amount=7.448958324, mode=Mode.SUBTRACT)
    with BuildSketch(Plane(origin=(-23.343891195, -2.448958324, -2.704208553), x_dir=(0.13532554648000364, 0, -0.9908011891746439), z_dir=(0, 1, 0)), Plane(origin=(-22.762501572, -2.448958324, 5.841106248), x_dir=(-0.22873410917279471, 0, -0.9734889353767346), z_dir=(0, 1, 0))) as fillet6_of_cirpattern2_piece_2:
        with BuildLine():
            CenterArc((0.979795982, 0.999791645), FILLET6_OF_CIRPATTERN2_R, 181.169626537, 87.660746926)
            Line((-0.019995663, 0.979379229), (0, 0))
            ThreePointArc((0, 0), (0.479691783, 0.004896344), (0.959383566, 0))
        make_face()
    extrude(amount=7.448958324, mode=Mode.SUBTRACT)
    with BuildSketch(Plane(origin=(-26.323962411, -2.598538983, -3.049426666), x_dir=(0.13453190929886197, 0, -0.9909092619308807), z_dir=(0, 1, 0)), Plane(origin=(-25.668352836, -2.598538983, 6.586779386), x_dir=(-0.22951376312290186, 0, -0.9733054158573065), z_dir=(0, 1, 0))) as fillet6_of_cirpattern2_piece_3:
        with BuildLine():
            CenterArc((1.019803978, -0.999807674), FILLET6_OF_CIRPATTERN2_R, 88.876265191, 92.247469618)
            Line((0.019996304, -1.019419289), (0, 0))
            ThreePointArc((0, 0), (0.519707797, 0.005096645), (1.039415593, 0))
        make_face()
    extrude(amount=7.598538983, mode=Mode.SUBTRACT)
    with BuildSketch(Plane(origin=(-26.459796577, -2.598538983, 1.459165901), x_dir=(0.07463413613309515, 0, 0.9972109835554694), z_dir=(0, 1, 0)), Plane(origin=(-24.179429881, -2.598538983, 10.844591769), x_dir=(0.4270454240832149, 0, 0.904230173003305), z_dir=(0, 1, 0))) as fillet6_of_cirpattern2_piece_4:
        with BuildLine():
            CenterArc((1.019803978, 0.999807674), FILLET6_OF_CIRPATTERN2_R, 178.876265191, 92.247469618)
            Line((0.019996304, 1.019419289), (0, 0))
            ThreePointArc((0, 0), (0.519707797, -0.005096645), (1.039415593, 0))
        make_face()
    extrude(amount=7.598538983, mode=Mode.SUBTRACT)


solid = part.part
